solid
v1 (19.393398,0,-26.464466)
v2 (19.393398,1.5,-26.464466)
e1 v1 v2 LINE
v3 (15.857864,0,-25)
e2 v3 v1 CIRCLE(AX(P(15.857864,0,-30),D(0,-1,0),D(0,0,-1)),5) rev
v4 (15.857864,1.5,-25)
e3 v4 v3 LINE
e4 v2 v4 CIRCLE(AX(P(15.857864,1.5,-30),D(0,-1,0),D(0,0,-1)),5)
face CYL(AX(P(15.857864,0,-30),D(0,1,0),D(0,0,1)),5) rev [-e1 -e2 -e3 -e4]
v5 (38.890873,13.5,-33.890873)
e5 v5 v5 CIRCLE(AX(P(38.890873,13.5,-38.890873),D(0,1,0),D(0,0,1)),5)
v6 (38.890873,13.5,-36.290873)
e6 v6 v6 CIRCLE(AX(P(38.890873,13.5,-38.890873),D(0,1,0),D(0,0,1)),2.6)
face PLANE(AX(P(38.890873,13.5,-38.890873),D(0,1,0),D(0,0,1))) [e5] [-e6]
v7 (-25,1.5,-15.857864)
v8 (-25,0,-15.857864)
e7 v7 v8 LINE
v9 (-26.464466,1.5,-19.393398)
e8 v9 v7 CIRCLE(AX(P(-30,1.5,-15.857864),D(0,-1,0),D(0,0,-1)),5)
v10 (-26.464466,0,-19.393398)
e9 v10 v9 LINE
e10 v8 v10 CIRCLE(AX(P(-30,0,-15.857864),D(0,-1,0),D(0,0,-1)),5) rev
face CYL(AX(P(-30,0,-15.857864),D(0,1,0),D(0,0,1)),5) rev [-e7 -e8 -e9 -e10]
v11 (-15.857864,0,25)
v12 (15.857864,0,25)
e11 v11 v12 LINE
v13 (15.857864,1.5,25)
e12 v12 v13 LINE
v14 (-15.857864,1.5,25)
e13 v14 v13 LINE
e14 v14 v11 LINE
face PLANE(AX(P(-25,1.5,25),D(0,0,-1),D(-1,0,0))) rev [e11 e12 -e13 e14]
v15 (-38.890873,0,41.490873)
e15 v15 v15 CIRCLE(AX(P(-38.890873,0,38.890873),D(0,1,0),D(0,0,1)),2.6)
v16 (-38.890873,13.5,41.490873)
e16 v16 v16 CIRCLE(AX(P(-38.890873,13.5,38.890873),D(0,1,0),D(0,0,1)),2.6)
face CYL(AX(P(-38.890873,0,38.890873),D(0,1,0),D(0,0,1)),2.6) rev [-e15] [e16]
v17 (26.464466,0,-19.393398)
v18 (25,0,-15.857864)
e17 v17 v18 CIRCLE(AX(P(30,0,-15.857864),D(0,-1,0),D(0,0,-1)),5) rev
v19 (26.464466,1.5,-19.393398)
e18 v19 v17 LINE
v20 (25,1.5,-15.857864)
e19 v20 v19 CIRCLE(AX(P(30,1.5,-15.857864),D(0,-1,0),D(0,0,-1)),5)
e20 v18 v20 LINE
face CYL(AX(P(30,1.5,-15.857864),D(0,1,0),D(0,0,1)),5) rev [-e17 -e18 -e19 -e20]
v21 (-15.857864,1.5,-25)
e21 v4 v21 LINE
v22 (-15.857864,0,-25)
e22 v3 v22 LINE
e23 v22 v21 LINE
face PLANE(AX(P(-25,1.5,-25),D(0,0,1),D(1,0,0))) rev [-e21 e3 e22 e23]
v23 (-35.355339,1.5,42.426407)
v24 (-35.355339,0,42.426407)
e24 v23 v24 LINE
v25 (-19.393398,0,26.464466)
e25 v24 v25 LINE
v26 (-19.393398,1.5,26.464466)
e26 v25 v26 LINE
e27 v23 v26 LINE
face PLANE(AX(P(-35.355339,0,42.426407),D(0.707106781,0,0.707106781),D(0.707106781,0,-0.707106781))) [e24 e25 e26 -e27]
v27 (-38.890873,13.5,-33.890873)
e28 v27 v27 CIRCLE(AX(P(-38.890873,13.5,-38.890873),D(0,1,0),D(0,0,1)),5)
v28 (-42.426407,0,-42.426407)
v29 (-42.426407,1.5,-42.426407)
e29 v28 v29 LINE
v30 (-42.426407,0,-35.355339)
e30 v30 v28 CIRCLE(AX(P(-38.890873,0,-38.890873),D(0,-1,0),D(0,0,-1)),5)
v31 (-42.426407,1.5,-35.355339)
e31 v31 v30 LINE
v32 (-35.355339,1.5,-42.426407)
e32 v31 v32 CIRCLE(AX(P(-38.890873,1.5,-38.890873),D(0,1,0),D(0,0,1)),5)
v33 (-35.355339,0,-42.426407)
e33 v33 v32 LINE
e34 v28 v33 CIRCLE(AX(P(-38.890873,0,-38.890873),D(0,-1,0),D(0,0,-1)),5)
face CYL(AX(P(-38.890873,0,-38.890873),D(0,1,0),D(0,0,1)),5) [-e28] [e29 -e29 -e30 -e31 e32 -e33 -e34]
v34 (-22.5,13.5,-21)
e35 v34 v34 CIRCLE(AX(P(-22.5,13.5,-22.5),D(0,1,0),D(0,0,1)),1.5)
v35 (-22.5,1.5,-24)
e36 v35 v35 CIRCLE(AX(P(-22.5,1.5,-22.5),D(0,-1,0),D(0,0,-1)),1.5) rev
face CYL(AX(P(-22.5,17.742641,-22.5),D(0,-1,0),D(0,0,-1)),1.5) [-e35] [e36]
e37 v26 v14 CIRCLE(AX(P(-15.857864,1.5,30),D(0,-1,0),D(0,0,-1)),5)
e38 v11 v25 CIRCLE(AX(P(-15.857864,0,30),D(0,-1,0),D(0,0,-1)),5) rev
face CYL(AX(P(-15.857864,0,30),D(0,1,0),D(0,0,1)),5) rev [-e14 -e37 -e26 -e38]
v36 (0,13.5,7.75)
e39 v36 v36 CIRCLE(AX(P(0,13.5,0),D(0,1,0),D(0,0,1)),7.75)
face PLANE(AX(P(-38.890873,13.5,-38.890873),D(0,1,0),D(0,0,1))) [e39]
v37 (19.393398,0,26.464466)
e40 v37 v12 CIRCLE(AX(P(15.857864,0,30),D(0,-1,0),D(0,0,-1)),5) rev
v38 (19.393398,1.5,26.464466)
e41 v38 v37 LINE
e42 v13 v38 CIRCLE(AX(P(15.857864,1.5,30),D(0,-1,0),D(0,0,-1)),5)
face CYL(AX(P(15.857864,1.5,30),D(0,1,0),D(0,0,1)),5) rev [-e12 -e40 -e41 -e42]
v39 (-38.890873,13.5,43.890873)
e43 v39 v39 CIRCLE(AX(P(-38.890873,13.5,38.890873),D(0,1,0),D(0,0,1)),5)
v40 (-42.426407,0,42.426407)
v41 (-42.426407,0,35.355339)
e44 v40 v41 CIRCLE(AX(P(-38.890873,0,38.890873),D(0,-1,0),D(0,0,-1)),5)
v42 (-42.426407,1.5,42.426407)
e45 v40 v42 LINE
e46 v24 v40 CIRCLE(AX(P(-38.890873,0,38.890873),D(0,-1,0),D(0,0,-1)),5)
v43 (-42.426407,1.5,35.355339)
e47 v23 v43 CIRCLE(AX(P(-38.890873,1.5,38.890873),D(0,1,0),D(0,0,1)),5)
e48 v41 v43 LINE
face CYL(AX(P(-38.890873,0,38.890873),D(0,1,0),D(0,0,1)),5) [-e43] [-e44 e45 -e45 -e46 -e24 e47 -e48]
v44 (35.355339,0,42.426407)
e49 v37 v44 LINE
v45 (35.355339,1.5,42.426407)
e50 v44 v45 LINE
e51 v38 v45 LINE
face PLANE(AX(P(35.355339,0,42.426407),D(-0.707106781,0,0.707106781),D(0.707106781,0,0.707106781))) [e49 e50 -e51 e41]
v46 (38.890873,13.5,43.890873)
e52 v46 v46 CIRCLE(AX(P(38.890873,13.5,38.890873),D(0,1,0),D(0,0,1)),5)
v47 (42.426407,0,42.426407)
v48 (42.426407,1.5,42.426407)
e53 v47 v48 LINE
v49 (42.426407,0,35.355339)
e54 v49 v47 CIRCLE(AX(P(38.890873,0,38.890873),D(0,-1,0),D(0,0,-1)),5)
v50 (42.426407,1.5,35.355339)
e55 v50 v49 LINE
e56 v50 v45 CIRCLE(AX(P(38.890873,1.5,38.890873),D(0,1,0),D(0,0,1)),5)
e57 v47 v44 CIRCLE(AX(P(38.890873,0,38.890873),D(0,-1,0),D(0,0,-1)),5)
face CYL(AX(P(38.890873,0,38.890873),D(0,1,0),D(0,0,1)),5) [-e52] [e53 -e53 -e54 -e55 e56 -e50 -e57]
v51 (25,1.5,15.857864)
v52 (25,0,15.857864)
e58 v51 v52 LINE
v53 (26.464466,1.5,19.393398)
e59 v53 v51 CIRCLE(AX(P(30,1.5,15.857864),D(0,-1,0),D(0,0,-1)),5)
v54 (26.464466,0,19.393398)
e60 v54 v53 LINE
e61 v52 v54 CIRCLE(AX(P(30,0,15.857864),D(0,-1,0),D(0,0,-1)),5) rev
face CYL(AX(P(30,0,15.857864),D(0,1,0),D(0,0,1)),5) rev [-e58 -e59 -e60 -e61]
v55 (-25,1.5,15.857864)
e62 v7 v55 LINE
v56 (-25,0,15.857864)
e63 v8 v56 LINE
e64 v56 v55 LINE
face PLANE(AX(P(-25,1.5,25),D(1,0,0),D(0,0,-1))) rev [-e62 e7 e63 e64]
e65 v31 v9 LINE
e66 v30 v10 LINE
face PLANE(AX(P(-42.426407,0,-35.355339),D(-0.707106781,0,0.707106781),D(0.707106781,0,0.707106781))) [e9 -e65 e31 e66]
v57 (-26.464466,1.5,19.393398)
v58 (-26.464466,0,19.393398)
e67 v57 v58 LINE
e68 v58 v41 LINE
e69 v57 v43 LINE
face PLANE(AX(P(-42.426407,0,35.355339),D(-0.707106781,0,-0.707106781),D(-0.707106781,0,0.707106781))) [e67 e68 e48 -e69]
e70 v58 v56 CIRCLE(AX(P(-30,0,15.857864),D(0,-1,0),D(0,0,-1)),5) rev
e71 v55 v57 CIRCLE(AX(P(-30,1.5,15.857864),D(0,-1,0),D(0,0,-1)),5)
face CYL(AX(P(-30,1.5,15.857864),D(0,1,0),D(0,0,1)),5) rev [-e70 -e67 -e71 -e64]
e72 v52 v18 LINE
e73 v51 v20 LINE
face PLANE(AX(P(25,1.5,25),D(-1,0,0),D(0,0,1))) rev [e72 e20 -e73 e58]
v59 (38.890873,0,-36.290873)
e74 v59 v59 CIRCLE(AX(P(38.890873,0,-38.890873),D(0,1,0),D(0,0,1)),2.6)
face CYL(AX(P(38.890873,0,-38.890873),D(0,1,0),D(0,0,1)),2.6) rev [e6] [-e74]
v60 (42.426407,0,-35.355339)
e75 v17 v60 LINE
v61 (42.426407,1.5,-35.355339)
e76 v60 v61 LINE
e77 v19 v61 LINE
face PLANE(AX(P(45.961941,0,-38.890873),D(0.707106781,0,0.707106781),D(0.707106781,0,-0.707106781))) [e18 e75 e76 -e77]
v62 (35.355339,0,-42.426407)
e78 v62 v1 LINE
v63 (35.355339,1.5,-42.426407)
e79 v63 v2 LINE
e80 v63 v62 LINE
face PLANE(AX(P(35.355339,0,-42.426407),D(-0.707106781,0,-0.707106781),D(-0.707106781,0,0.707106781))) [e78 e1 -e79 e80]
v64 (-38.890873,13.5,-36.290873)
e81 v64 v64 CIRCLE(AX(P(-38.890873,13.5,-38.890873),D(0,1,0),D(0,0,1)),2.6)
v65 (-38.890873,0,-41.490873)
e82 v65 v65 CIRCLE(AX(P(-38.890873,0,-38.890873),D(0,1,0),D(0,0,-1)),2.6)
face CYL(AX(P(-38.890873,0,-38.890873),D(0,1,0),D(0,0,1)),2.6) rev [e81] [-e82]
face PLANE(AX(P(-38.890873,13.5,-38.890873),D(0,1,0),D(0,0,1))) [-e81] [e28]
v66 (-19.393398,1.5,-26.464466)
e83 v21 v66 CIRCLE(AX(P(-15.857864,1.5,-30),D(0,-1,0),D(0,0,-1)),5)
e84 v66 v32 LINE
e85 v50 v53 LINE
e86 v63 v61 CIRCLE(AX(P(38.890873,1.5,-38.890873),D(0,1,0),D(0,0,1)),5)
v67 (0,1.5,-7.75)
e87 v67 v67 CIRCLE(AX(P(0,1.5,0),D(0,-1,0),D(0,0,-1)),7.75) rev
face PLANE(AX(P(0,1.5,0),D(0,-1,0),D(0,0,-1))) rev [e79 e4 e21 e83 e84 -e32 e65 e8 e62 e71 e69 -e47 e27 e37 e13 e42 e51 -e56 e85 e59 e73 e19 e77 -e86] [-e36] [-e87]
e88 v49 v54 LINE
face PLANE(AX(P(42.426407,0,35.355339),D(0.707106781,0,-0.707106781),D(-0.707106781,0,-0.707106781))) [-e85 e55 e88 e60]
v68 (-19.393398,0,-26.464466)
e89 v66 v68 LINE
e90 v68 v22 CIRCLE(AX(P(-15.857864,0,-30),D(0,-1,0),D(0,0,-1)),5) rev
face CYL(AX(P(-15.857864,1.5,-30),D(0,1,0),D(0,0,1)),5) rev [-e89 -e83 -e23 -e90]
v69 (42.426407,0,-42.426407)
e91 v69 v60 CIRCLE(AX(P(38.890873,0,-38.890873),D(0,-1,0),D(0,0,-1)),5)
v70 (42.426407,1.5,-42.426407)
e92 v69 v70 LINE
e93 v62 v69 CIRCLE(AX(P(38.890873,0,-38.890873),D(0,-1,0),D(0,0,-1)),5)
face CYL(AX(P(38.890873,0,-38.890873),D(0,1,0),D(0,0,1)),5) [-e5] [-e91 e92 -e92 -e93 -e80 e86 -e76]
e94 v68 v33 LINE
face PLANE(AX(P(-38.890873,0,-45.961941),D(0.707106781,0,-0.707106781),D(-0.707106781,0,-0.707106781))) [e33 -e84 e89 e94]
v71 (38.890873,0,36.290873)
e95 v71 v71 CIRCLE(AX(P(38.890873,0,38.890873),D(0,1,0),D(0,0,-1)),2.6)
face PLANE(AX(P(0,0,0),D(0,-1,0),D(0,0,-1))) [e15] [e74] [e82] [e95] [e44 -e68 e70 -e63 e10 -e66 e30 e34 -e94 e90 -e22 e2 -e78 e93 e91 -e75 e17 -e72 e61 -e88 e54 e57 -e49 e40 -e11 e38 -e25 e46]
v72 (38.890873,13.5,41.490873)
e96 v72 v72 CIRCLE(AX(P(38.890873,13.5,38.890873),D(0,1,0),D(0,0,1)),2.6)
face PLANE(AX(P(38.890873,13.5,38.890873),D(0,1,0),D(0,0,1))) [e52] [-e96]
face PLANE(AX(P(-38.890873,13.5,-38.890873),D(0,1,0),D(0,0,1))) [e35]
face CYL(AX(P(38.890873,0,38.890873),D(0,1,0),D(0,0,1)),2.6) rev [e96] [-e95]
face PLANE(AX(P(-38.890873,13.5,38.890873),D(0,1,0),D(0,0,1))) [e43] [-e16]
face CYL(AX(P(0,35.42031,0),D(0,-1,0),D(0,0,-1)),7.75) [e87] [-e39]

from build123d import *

# Parameters (mm, degrees)
SKETCH1_W           = 50
SKETCH1_H           = 50
SKETCH1_R           = 8
BOSS_EXTRUDE1_DEPTH = 1.5
BOSS_EXTRUDE3_START = -1.5
SKETCH5_R           = 2.6
SKETCH5_R_2         = 8
BOSS_EXTRUDE3_DEPTH = 1.5
FILLET1_R           = 5
SKETCH6_R           = 5
SKETCH6_R_2         = 2.6
BOSS_EXTRUDE4_DEPTH = 12
SKETCH7_R           = 8.25
BOSS_EXTRUDE5_DEPTH = 1.5
SKETCH8_R           = 7.75
BOSS_EXTRUDE6_DEPTH = 12
SKETCH9_R           = 1.5
BOSS_EXTRUDE7_DEPTH = 12


with BuildPart() as part:
    # Sketch1 → Boss-Extrude1 (new body)
    with BuildSketch(Plane(origin=(0, 0, 0), x_dir=(1, 0, 0), z_dir=(0, 1, 0))):
        Rectangle(SKETCH1_W, SKETCH1_H)
        with Locations(Location((0, 0, 0), (0, 0, 270))):
            Circle(SKETCH1_R, mode=Mode.SUBTRACT)
    extrude(amount=BOSS_EXTRUDE1_DEPTH)

    # Sketch5 → Boss-Extrude3 (add)
    with BuildSketch(Plane(origin=(0, 1.5, 0), x_dir=(1, 0, 0), z_dir=(0, 1, 0)).offset(BOSS_EXTRUDE3_START)):
        Polygon((-42.426406871, -35.355339059), (-25, -17.928932188), (-25, 17.928932188), (-42.426406871, 35.355339059), (-45.961940777, 38.890872965), (-38.890872965, 45.961940777), (-35.355339059, 42.426406871), (-17.928932188, 25), (17.928932188, 25), (35.355339059, 42.426406871), (38.890872965, 45.961940777), (45.961940777, 38.890872965), (42.426406871, 35.355339059), (25, 17.928932188), (25, -17.928932188), (42.426406871, -35.355339059), (45.961940777, -38.890872965), (38.890872965, -45.961940777), (35.355339059, -42.426406871), (17.928932188, -25), (-17.928932188, -25), (-35.355339059, -42.426406871), (-38.890872965, -45.961940777), (-45.961940777, -38.890872965), align=None)
        with Locations(Location((-38.890872965, -38.890872965, 0), (0, 0, 270))):
            Circle(SKETCH5_R, mode=Mode.SUBTRACT)
        with Locations(Location((38.890872965, 38.890872965, 0), (0, 0, 270))):
            Circle(SKETCH5_R, mode=Mode.SUBTRACT)
        with Locations(Location((38.890872965, -38.890872965, 0), (0, 0, 90))):
            Circle(SKETCH5_R, mode=Mode.SUBTRACT)
        with Locations(Location((-38.890872965, 38.890872965, 0), (0, 0, 90))):
            Circle(SKETCH5_R, mode=Mode.SUBTRACT)
        with Locations(Location((0, 0, 0), (0, 0, 270))):
            Circle(SKETCH5_R_2, mode=Mode.SUBTRACT)
    extrude(amount=BOSS_EXTRUDE3_DEPTH)

    # Fillet1
    fillet1_edges = [part.edges().sort_by_distance(p)[0] for p in [
        (17.928932188, 0.75, 25),
        (38.890872965, 0.75, 45.961940777),
        (45.961940777, 0.75, 38.890872965),
        (25, 0.75, 17.928932188),
        (25, 0.75, -17.928932188),
        (45.961940777, 0.75, -38.890872965),
        (38.890872965, 0.75, -45.961940777),
        (17.928932188, 0.75, -25),
        (-17.928932188, 0.75, -25),
        (-38.890872965, 0.75, -45.961940777),
        (-45.961940777, 0.75, -38.890872965),
        (-25, 0.75, -17.928932188),
        (-25, 0.75, 17.928932188),
        (-45.961940777, 0.75, 38.890872965),
        (-38.890872965, 0.75, 45.961940777),
        (-17.928932188, 0.75, 25),
    ]]
    fillet(fillet1_edges, radius=FILLET1_R - 0.0001)  # a hair under: the kernel refuses the full size

    # Sketch6 → Boss-Extrude4 (add)
    # profile 1 of 4: a face of its own
    with BuildSketch(Plane(origin=(0, 1.5, 0), x_dir=(1, 0, 0), z_dir=(0, 1, 0))):
        with Locations(Location((-38.890872965, -38.890872965, 0), (0, 0, 270))):
            Circle(SKETCH6_R)
        with Locations(Location((-38.890872965, -38.890872965, 0), (0, 0, 270))):
            Circle(SKETCH6_R_2, mode=Mode.SUBTRACT)
    # profile 2 of 4: a face of its own
    with BuildSketch(Plane(origin=(0, 1.5, 0), x_dir=(1, 0, 0), z_dir=(0, 1, 0))):
        with Locations(Location((-38.890872965, 38.890872965, 0), (0, 0, 270))):
            Circle(SKETCH6_R)
        with Locations(Location((-38.890872965, 38.890872965, 0), (0, 0, 270))):
            Circle(SKETCH6_R_2, mode=Mode.SUBTRACT)
    # profile 3 of 4: a face of its own
    with BuildSketch(Plane(origin=(0, 1.5, 0), x_dir=(1, 0, 0), z_dir=(0, 1, 0))):
        with Locations(Location((38.890872965, 38.890872965, 0), (0, 0, 270))):
            Circle(SKETCH6_R)
        with Locations(Location((38.890872965, 38.890872965, 0), (0, 0, 270))):
            Circle(SKETCH6_R_2, mode=Mode.SUBTRACT)
    # profile 4 of 4: a face of its own
    with BuildSketch(Plane(origin=(0, 1.5, 0), x_dir=(1, 0, 0), z_dir=(0, 1, 0))):
        with Locations(Location((38.890872965, -38.890872965, 0), (0, 0, 270))):
            Circle(SKETCH6_R)
        with Locations(Location((38.890872965, -38.890872965, 0), (0, 0, 270))):
            Circle(SKETCH6_R_2, mode=Mode.SUBTRACT)
    extrude(amount=BOSS_EXTRUDE4_DEPTH)

    # Sketch7 → Boss-Extrude5 (add)
    with BuildSketch(Plane(origin=(0, 1.5, 0), x_dir=(1, 0, 0), z_dir=(0, 1, 0))):
        Circle(SKETCH7_R)
    extrude(amount=-BOSS_EXTRUDE5_DEPTH)

    # Sketch8 → Boss-Extrude6 (add)
    with BuildSketch(Plane(origin=(0, 1.5, 0), x_dir=(1, 0, 0), z_dir=(0, 1, 0))):
        with Locations(Location((0, 0, 0), (0, 0, 90))):
            Circle(SKETCH8_R)
    extrude(amount=BOSS_EXTRUDE6_DEPTH)

    # Sketch9 → Boss-Extrude7 (add)
    with BuildSketch(Plane(origin=(0, 1.5, 0), x_dir=(1, 0, 0), z_dir=(0, 1, 0))):
        with Locations(Location((-22.5, 22.5, 0), (0, 0, 90))):
            Circle(SKETCH9_R)
    extrude(amount=BOSS_EXTRUDE7_DEPTH)


solid = part.part
